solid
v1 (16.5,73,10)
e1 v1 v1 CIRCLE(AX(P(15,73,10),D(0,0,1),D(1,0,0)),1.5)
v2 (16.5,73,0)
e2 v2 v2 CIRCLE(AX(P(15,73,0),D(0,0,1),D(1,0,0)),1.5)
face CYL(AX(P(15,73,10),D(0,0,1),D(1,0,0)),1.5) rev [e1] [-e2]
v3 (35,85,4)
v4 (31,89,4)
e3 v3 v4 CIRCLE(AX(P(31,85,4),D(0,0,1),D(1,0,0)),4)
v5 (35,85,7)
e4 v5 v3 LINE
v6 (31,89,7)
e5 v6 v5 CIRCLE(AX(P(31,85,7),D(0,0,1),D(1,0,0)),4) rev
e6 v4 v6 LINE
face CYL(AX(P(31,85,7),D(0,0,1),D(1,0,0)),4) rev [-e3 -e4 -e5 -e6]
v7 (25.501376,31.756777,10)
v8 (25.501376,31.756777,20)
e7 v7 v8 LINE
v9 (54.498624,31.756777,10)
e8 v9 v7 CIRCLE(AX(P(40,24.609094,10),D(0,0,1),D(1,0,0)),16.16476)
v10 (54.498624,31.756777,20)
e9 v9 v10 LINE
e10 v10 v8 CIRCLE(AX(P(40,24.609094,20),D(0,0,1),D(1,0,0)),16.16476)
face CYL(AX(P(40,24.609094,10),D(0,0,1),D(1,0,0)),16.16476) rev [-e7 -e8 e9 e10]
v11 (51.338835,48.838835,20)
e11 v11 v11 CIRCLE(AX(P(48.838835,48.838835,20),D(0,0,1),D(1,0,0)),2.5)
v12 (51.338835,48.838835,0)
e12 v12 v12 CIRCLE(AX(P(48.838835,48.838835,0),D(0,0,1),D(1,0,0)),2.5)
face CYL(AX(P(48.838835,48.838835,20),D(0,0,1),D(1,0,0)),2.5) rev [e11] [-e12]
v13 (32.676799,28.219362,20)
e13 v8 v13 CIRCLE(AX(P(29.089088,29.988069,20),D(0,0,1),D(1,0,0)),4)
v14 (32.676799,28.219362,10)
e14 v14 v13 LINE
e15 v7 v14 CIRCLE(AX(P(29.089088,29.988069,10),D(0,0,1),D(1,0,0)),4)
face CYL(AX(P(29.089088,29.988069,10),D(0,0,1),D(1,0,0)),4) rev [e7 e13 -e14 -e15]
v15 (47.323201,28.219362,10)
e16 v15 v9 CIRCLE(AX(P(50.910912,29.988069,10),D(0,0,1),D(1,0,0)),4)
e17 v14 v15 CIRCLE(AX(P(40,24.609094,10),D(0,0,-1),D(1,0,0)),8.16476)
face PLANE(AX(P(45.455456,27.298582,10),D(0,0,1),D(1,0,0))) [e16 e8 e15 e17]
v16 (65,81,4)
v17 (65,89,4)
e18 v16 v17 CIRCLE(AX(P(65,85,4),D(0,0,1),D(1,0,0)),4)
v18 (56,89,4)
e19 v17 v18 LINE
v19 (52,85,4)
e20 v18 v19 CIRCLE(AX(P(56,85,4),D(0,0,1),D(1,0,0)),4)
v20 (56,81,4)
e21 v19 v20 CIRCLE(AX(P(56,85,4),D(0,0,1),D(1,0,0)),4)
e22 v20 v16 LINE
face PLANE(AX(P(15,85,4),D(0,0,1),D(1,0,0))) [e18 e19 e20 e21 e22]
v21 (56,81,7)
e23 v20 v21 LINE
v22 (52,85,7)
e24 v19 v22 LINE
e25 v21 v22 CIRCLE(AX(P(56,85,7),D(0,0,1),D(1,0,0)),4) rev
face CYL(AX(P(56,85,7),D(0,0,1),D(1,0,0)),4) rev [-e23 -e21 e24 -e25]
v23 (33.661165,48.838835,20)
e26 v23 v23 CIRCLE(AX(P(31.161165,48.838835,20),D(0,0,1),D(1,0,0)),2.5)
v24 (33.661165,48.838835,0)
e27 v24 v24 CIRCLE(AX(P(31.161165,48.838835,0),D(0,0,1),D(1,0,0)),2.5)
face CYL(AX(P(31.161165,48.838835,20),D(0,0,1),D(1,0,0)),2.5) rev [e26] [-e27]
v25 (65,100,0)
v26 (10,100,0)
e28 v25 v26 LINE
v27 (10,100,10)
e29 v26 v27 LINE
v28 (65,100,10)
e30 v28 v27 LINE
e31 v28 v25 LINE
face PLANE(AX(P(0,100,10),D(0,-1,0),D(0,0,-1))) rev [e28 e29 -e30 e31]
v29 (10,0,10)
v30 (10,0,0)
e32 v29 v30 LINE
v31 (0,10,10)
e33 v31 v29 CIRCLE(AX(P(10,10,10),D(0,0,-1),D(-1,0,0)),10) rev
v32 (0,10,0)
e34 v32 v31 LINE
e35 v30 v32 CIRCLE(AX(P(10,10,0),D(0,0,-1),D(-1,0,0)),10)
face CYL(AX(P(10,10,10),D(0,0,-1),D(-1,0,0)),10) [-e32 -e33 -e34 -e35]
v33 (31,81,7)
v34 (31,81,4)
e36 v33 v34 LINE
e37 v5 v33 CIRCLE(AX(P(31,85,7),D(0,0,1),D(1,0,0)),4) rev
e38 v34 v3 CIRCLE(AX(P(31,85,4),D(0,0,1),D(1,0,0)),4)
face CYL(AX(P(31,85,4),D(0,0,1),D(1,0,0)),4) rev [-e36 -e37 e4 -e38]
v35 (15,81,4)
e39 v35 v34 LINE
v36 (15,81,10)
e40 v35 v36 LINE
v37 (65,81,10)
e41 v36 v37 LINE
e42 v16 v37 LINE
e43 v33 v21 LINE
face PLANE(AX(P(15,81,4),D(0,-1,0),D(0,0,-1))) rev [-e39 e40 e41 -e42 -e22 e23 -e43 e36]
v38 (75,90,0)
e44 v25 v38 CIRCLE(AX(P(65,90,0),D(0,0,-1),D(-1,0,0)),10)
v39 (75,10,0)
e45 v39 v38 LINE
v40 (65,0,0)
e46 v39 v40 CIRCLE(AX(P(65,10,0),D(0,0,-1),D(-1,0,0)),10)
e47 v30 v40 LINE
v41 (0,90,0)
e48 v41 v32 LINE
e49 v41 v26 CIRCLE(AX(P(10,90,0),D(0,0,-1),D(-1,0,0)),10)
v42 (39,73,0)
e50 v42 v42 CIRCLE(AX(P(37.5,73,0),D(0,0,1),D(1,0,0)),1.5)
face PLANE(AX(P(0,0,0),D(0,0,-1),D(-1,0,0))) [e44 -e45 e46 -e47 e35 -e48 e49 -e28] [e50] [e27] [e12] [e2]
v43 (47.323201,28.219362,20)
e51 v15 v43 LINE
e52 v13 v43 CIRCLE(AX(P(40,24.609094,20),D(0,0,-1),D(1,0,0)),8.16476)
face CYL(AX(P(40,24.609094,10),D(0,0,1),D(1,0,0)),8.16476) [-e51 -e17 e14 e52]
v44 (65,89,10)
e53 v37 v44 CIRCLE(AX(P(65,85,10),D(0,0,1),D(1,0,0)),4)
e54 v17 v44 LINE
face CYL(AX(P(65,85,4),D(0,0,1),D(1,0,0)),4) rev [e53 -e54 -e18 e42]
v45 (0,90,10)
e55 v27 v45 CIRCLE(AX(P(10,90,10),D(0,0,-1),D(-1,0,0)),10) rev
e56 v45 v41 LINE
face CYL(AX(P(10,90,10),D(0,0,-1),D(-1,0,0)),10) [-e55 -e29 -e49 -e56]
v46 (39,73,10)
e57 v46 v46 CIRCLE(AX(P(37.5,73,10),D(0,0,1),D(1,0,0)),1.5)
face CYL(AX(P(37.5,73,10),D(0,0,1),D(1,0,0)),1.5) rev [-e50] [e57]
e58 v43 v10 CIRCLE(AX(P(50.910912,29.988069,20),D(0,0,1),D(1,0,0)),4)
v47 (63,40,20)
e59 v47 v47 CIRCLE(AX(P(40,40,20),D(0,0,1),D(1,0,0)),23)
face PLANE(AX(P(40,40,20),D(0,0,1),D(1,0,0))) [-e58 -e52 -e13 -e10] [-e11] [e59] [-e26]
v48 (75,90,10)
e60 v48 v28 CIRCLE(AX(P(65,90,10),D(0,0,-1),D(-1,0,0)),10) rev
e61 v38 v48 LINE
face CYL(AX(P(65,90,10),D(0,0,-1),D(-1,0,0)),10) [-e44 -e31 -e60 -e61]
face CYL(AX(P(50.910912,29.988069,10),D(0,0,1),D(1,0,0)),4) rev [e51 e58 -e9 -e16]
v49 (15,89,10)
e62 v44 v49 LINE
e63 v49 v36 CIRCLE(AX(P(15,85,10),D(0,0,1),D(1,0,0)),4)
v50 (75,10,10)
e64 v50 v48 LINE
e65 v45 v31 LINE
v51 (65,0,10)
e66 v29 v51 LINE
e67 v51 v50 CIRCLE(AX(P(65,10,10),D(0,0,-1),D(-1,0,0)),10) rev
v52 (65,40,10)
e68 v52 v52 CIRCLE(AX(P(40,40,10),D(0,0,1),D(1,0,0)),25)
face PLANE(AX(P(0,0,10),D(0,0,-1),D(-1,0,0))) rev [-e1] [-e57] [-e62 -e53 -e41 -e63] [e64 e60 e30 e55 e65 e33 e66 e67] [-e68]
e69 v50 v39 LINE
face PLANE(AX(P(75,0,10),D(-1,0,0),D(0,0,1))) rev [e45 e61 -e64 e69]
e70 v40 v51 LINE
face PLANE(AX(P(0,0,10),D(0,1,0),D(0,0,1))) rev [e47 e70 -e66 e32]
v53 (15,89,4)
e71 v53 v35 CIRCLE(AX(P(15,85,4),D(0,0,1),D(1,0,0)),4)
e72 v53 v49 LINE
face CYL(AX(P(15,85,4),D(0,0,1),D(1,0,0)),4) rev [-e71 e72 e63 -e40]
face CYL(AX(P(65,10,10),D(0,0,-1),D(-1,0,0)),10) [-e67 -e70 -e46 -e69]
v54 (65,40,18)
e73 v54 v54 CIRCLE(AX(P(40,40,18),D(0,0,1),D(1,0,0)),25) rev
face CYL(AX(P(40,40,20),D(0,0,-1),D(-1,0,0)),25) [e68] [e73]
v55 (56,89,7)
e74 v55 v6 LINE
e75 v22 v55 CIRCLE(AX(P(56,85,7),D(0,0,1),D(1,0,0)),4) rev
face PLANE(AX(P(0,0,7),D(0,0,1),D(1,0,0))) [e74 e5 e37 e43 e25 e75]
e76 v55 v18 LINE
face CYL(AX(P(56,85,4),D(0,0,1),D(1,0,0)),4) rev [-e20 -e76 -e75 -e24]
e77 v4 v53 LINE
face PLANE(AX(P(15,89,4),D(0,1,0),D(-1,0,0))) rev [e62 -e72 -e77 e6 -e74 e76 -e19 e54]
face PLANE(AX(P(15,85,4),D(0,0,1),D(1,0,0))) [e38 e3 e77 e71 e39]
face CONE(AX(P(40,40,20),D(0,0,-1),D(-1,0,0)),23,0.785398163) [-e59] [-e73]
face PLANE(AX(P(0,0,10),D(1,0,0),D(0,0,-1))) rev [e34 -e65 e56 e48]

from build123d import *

# Parameters (mm, degrees)
SKETCH2_W                    = 75
SKETCH2_H                    = 100
BOSS_EXTRUDE1_DEPTH          = 10
BOSS_EXTRUDE4_DEPTH          = 10
F_5_0_5_DIAMETER_HOLE1_D     = 5
CUT_EXTRUDE1_DEPTH           = 6
FILLET1_R                    = 10
F_3_0_3_DIAMETER_HOLE1_D     = 3
F_3_0_3_DIAMETER_HOLE1_DEPTH = 10
F_3_0_3_DIAMETER_HOLE1_TIP   = 0.901290929
SKETCH18_W                   = 17
SKETCH18_H                   = 8
BOSS_EXTRUDE5_DEPTH          = 3
FILLET2_R                    = 4
CUT_EXTRUDE2_DEPTH           = 10
CHAMFER1_SIZE                = 2


with BuildPart() as part:
    # Sketch2 → Boss-Extrude1 (new body)
    with BuildSketch(Plane.XY):
        with Locations((37.5, 50)):
            Rectangle(SKETCH2_W, SKETCH2_H)
    extrude(amount=BOSS_EXTRUDE1_DEPTH)

    # Sketch5 → Boss-Extrude4 (add)
    with BuildSketch(Plane.XY.offset(10)):
        with BuildLine():
            ThreePointArc((25.222170949, 60.16471593), (40, 15), (54.777829051, 60.16471593))
            ThreePointArc((54.777829051, 60.16471593), (51.923594578, 61.973345042), (48.851534275, 63.380554762))
            ThreePointArc((48.851534275, 63.380554762), (40, 65), (31.148465725, 63.380554762))
            ThreePointArc((31.148465725, 63.380554762), (28.076405422, 61.973345042), (25.222170949, 60.16471593))
        make_face()
    extrude(amount=BOSS_EXTRUDE4_DEPTH)

    # Ø5.0 (5) Diameter Hole1 (through all)
    with Locations(Plane.XY.offset(20)):
        with Locations((31.161165235, 48.838834765), (48.838834765, 48.838834765)):
            Hole(F_5_0_5_DIAMETER_HOLE1_D / 2)

    # Sketch12 → Cut-Extrude1 (cut)
    with BuildSketch(Plane.XY.offset(10)):
        with BuildLine():
            Line((15, 89), (65, 89))
            ThreePointArc((65, 89), (69, 85), (65, 81))
            Line((65, 81), (15, 81))
            ThreePointArc((15, 81), (11, 85), (15, 89))
        make_face()
    extrude(amount=-CUT_EXTRUDE1_DEPTH, mode=Mode.SUBTRACT)

    # Fillet1
    fillet1_edges = [part.edges().sort_by_distance(p)[0] for p in [
        (0, 100, 5),
        (75, 100, 5),
        (75, 0, 5),
        (0, 0, 5),
    ]]
    fillet(fillet1_edges, radius=FILLET1_R)

    # Ø3.0 (3) Diameter Hole1
    with Locations(Plane.XY.offset(10)):
        with Locations((15, 73), (37.5, 73)):
            Hole(F_3_0_3_DIAMETER_HOLE1_D / 2, depth=F_3_0_3_DIAMETER_HOLE1_DEPTH)
            with Locations((0, 0, -(F_3_0_3_DIAMETER_HOLE1_DEPTH + F_3_0_3_DIAMETER_HOLE1_TIP / 2))):  # 118° drill point
                Cone(0, F_3_0_3_DIAMETER_HOLE1_D / 2, F_3_0_3_DIAMETER_HOLE1_TIP, mode=Mode.SUBTRACT)

    # Sketch18 → Boss-Extrude5 (add)
    with BuildSketch(Plane.XY.offset(4)):
        with Locations((43.5, 85)):
            Rectangle(SKETCH18_W, SKETCH18_H)
    extrude(amount=BOSS_EXTRUDE5_DEPTH)

    # Fillet2
    fillet2_edges = [part.edges().sort_by_distance(p)[0] for p in [
        (52, 81, 5.5),
        (52, 89, 5.5),
        (35, 81, 5.5),
        (35, 89, 5.5),
    ]]
    fillet(fillet2_edges, radius=FILLET2_R - 0.0001)  # a hair under: the kernel refuses the full size

    # Sketch20 → Cut-Extrude2 (cut)
    with BuildSketch(Plane.XY.offset(20)):
        with BuildLine():
            ThreePointArc((54.498623519, 31.756776834), (40, 40.773853631), (25.501376481, 31.756776834))
            ThreePointArc((25.501376481, 31.756776834), (27.320380503, 26.400357846), (32.67679949, 28.219361868))
            ThreePointArc((32.67679949, 28.219361868), (40, 32.773853631), (47.32320051, 28.219361868))
            ThreePointArc((47.32320051, 28.219361868), (52.679619497, 26.400357846), (54.498623519, 31.756776834))
        make_face()
    extrude(amount=-CUT_EXTRUDE2_DEPTH, mode=Mode.SUBTRACT)

    # Chamfer1
    chamfer1_edges = [part.edges().sort_by_distance(p)[0] for p in [
        (25.222170949, 19.83528407, 20),
    ]]
    chamfer(chamfer1_edges, length=CHAMFER1_SIZE)


solid = part.part
